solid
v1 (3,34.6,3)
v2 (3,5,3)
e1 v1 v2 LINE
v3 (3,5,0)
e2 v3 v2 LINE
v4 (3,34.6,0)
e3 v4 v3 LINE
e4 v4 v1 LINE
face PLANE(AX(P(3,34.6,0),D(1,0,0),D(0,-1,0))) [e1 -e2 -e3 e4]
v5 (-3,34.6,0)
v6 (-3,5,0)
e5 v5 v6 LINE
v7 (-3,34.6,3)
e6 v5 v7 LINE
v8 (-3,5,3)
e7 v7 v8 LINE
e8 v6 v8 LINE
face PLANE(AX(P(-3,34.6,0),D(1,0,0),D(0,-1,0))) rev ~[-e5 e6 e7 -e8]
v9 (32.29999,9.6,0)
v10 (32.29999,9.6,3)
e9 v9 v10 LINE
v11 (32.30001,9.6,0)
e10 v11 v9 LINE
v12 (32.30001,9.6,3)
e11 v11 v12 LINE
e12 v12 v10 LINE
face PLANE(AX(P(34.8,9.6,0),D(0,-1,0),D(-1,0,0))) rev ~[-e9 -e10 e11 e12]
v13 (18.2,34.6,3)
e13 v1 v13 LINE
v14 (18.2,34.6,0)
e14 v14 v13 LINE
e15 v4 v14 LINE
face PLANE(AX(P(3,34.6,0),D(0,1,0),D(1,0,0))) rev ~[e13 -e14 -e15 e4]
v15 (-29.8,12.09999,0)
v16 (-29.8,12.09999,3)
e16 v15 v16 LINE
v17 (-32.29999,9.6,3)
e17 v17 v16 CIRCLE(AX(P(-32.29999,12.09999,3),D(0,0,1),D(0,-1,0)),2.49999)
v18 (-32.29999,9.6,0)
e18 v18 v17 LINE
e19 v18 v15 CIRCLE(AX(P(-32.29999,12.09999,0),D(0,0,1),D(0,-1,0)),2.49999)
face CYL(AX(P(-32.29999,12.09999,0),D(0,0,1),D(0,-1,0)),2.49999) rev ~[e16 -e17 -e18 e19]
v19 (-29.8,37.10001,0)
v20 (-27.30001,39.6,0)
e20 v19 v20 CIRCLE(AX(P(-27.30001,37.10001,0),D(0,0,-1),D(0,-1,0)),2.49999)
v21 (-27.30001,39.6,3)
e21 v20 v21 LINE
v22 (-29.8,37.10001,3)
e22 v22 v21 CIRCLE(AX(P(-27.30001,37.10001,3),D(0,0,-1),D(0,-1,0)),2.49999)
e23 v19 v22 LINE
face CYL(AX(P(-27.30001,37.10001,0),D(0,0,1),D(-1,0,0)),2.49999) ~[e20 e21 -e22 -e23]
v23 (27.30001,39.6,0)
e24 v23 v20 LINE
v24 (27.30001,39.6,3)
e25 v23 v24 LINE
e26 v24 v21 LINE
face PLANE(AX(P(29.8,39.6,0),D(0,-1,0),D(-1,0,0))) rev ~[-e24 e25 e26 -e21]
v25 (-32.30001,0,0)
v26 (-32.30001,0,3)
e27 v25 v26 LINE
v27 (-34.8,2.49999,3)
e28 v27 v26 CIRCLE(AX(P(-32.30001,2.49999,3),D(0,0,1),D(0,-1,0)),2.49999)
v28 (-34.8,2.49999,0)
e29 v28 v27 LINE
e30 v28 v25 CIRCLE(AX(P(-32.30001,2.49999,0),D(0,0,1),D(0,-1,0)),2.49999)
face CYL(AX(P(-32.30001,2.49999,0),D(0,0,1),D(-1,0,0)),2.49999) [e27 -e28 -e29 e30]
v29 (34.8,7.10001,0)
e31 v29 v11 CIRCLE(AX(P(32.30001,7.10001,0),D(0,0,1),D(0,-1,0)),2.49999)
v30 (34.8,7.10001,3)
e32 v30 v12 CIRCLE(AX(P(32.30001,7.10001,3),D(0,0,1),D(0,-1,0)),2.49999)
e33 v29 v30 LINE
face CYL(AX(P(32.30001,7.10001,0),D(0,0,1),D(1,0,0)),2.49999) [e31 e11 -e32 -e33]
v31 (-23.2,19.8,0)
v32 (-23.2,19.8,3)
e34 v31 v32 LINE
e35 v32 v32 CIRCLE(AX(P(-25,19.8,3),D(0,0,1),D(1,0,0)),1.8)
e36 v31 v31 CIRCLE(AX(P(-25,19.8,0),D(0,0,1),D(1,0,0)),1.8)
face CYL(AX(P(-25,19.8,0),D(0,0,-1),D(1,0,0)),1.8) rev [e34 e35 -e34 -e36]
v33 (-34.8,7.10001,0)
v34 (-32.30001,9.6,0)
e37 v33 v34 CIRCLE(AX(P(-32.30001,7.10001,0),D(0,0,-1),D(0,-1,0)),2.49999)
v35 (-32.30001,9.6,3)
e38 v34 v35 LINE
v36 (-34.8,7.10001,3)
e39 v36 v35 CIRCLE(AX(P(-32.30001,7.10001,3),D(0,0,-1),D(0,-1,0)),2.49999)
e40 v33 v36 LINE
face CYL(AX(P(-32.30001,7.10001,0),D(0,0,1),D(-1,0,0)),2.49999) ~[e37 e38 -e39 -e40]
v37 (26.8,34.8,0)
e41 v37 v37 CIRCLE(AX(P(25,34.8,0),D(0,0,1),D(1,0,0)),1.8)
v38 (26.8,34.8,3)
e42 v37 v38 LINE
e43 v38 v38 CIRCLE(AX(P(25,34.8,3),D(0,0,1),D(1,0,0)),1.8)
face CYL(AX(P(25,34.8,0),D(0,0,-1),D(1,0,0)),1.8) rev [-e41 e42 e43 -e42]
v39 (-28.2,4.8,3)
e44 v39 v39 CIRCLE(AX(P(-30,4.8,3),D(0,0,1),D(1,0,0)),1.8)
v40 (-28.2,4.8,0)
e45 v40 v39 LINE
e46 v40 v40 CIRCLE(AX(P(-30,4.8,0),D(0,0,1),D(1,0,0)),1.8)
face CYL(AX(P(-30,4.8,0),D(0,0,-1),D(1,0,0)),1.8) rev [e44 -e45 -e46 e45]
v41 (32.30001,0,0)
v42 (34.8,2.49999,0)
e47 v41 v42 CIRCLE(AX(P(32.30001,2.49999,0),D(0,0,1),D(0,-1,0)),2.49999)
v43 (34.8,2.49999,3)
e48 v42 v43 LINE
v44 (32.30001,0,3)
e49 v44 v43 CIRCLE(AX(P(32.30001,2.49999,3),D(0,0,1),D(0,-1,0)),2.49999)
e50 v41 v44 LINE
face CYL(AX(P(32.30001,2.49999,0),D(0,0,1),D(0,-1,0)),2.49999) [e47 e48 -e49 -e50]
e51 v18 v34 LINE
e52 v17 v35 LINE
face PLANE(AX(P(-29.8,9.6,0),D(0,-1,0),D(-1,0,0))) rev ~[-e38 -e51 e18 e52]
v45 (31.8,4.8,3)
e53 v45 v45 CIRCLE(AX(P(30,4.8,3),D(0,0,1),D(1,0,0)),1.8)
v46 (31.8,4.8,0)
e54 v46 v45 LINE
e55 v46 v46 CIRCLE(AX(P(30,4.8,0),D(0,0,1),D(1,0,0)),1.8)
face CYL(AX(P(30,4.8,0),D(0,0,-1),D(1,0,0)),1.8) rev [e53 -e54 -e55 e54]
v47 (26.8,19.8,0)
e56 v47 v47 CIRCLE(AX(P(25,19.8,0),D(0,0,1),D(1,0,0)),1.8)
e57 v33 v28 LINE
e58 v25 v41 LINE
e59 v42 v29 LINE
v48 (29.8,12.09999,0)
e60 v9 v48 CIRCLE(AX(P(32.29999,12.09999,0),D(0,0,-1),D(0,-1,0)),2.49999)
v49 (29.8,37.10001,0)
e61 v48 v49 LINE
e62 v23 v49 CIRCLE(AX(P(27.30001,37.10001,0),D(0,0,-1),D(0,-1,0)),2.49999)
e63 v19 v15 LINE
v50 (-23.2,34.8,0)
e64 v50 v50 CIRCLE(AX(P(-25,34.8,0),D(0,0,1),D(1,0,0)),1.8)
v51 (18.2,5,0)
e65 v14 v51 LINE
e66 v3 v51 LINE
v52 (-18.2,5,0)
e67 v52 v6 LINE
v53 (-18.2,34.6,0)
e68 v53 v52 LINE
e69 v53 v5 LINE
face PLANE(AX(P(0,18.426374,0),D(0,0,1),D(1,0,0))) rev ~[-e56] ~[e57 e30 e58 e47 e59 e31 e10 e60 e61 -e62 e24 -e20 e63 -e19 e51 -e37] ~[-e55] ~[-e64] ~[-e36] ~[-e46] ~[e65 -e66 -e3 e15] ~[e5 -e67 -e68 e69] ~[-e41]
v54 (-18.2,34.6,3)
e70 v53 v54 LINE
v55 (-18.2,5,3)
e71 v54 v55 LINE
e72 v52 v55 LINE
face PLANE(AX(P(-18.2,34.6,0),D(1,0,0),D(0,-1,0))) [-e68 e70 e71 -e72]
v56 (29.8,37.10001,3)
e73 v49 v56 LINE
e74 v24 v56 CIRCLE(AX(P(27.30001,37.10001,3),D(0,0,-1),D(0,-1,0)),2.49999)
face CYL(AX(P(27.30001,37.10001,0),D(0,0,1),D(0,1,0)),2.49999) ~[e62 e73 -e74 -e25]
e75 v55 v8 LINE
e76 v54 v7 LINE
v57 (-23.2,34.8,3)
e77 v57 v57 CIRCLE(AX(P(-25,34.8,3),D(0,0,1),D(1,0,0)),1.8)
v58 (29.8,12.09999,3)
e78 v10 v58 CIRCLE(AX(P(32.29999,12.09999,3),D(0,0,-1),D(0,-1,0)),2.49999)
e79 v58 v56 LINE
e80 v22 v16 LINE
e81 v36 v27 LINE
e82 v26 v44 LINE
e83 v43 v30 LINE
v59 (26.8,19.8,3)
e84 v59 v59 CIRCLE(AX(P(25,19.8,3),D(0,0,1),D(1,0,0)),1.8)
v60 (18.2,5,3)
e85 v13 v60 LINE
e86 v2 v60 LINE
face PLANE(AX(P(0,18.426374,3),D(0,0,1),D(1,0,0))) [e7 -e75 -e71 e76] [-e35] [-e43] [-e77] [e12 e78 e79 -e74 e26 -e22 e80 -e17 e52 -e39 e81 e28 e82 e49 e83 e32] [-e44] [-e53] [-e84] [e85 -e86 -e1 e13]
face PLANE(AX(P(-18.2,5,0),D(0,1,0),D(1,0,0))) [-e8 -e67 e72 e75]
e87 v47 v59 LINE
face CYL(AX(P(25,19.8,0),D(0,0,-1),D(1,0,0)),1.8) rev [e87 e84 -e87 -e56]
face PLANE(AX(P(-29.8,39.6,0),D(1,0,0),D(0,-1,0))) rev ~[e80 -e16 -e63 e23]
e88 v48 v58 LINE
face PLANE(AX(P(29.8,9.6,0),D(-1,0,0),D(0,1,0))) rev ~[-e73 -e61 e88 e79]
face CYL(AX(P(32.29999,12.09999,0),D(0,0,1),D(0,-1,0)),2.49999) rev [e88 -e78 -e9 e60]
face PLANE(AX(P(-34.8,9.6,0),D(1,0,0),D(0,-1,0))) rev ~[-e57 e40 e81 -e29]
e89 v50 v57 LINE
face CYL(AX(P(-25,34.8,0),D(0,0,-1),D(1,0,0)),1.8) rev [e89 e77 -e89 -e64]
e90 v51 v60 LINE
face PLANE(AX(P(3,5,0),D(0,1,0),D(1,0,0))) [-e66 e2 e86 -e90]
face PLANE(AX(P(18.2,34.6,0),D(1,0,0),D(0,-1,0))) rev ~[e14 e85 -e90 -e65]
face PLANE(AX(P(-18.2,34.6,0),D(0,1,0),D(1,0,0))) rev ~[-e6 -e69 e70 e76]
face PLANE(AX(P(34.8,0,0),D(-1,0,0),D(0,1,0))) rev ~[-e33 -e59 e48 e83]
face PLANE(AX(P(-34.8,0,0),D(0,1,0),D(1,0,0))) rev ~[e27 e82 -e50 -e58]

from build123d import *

# Parameters (mm, degrees)
F0_R     = 1.8
F1_DEPTH = 3
F2_R     = 2.49999
F3_W     = 15.2
F3_H     = 29.6
F4_DEPTH = 3


# Not quite as in the source:
# - a fillet or chamfer is up to 0.001 mm smaller than in the source, because OpenCascade refuses the exact size


with BuildPart() as f1:
    # F0 (on Top) → F1 (new body)
    with BuildSketch(Plane.XY):
        Polygon((-34.8, 9.6), (-34.8, 0), (34.8, 0), (34.8, 9.6), (29.8, 9.6), (29.8, 39.6), (-29.8, 39.6), (-29.8, 9.6), align=None)
        with Locations((-30, 4.8)):
            Circle(F0_R, mode=Mode.SUBTRACT)
        with Locations((30, 4.8)):
            Circle(F0_R, mode=Mode.SUBTRACT)
        with Locations((-25, 19.8)):
            Circle(F0_R, mode=Mode.SUBTRACT)
        with Locations((-25, 34.8)):
            Circle(F0_R, mode=Mode.SUBTRACT)
        with Locations((25, 19.8)):
            Circle(F0_R, mode=Mode.SUBTRACT)
        with Locations((25, 34.8)):
            Circle(F0_R, mode=Mode.SUBTRACT)
    extrude(amount=F1_DEPTH)

    # F2 (radius 2.5 in the source; OpenCascade refuses exactly that, so slightly less here)
    f2_edges = [f1.edges().sort_by_distance(p)[0] for p in [
        (-34.8, 0, 1.5),
        (-34.8, 9.6, 1.5),
        (-29.8, 9.6, 1.5),
        (34.8, 0, 1.5),
        (29.8, 9.6, 1.5),
        (34.8, 9.6, 1.5),
        (29.8, 39.6, 1.5),
        (-29.8, 39.6, 1.5),
    ]]
    fillet(f2_edges, radius=F2_R)

    # F3 (on face) → F4 (cut, through all)
    with BuildSketch(Plane(origin=(0, 0, 0), x_dir=(1, 0, 0), z_dir=(0, 0, -1))):
        with Locations((10.6, -19.8)):
            Rectangle(F3_W, F3_H)
        with Locations((-10.6, -19.8)):
            Rectangle(F3_W, F3_H)
    extrude(amount=-F4_DEPTH, mode=Mode.SUBTRACT)


solid = f1.part
